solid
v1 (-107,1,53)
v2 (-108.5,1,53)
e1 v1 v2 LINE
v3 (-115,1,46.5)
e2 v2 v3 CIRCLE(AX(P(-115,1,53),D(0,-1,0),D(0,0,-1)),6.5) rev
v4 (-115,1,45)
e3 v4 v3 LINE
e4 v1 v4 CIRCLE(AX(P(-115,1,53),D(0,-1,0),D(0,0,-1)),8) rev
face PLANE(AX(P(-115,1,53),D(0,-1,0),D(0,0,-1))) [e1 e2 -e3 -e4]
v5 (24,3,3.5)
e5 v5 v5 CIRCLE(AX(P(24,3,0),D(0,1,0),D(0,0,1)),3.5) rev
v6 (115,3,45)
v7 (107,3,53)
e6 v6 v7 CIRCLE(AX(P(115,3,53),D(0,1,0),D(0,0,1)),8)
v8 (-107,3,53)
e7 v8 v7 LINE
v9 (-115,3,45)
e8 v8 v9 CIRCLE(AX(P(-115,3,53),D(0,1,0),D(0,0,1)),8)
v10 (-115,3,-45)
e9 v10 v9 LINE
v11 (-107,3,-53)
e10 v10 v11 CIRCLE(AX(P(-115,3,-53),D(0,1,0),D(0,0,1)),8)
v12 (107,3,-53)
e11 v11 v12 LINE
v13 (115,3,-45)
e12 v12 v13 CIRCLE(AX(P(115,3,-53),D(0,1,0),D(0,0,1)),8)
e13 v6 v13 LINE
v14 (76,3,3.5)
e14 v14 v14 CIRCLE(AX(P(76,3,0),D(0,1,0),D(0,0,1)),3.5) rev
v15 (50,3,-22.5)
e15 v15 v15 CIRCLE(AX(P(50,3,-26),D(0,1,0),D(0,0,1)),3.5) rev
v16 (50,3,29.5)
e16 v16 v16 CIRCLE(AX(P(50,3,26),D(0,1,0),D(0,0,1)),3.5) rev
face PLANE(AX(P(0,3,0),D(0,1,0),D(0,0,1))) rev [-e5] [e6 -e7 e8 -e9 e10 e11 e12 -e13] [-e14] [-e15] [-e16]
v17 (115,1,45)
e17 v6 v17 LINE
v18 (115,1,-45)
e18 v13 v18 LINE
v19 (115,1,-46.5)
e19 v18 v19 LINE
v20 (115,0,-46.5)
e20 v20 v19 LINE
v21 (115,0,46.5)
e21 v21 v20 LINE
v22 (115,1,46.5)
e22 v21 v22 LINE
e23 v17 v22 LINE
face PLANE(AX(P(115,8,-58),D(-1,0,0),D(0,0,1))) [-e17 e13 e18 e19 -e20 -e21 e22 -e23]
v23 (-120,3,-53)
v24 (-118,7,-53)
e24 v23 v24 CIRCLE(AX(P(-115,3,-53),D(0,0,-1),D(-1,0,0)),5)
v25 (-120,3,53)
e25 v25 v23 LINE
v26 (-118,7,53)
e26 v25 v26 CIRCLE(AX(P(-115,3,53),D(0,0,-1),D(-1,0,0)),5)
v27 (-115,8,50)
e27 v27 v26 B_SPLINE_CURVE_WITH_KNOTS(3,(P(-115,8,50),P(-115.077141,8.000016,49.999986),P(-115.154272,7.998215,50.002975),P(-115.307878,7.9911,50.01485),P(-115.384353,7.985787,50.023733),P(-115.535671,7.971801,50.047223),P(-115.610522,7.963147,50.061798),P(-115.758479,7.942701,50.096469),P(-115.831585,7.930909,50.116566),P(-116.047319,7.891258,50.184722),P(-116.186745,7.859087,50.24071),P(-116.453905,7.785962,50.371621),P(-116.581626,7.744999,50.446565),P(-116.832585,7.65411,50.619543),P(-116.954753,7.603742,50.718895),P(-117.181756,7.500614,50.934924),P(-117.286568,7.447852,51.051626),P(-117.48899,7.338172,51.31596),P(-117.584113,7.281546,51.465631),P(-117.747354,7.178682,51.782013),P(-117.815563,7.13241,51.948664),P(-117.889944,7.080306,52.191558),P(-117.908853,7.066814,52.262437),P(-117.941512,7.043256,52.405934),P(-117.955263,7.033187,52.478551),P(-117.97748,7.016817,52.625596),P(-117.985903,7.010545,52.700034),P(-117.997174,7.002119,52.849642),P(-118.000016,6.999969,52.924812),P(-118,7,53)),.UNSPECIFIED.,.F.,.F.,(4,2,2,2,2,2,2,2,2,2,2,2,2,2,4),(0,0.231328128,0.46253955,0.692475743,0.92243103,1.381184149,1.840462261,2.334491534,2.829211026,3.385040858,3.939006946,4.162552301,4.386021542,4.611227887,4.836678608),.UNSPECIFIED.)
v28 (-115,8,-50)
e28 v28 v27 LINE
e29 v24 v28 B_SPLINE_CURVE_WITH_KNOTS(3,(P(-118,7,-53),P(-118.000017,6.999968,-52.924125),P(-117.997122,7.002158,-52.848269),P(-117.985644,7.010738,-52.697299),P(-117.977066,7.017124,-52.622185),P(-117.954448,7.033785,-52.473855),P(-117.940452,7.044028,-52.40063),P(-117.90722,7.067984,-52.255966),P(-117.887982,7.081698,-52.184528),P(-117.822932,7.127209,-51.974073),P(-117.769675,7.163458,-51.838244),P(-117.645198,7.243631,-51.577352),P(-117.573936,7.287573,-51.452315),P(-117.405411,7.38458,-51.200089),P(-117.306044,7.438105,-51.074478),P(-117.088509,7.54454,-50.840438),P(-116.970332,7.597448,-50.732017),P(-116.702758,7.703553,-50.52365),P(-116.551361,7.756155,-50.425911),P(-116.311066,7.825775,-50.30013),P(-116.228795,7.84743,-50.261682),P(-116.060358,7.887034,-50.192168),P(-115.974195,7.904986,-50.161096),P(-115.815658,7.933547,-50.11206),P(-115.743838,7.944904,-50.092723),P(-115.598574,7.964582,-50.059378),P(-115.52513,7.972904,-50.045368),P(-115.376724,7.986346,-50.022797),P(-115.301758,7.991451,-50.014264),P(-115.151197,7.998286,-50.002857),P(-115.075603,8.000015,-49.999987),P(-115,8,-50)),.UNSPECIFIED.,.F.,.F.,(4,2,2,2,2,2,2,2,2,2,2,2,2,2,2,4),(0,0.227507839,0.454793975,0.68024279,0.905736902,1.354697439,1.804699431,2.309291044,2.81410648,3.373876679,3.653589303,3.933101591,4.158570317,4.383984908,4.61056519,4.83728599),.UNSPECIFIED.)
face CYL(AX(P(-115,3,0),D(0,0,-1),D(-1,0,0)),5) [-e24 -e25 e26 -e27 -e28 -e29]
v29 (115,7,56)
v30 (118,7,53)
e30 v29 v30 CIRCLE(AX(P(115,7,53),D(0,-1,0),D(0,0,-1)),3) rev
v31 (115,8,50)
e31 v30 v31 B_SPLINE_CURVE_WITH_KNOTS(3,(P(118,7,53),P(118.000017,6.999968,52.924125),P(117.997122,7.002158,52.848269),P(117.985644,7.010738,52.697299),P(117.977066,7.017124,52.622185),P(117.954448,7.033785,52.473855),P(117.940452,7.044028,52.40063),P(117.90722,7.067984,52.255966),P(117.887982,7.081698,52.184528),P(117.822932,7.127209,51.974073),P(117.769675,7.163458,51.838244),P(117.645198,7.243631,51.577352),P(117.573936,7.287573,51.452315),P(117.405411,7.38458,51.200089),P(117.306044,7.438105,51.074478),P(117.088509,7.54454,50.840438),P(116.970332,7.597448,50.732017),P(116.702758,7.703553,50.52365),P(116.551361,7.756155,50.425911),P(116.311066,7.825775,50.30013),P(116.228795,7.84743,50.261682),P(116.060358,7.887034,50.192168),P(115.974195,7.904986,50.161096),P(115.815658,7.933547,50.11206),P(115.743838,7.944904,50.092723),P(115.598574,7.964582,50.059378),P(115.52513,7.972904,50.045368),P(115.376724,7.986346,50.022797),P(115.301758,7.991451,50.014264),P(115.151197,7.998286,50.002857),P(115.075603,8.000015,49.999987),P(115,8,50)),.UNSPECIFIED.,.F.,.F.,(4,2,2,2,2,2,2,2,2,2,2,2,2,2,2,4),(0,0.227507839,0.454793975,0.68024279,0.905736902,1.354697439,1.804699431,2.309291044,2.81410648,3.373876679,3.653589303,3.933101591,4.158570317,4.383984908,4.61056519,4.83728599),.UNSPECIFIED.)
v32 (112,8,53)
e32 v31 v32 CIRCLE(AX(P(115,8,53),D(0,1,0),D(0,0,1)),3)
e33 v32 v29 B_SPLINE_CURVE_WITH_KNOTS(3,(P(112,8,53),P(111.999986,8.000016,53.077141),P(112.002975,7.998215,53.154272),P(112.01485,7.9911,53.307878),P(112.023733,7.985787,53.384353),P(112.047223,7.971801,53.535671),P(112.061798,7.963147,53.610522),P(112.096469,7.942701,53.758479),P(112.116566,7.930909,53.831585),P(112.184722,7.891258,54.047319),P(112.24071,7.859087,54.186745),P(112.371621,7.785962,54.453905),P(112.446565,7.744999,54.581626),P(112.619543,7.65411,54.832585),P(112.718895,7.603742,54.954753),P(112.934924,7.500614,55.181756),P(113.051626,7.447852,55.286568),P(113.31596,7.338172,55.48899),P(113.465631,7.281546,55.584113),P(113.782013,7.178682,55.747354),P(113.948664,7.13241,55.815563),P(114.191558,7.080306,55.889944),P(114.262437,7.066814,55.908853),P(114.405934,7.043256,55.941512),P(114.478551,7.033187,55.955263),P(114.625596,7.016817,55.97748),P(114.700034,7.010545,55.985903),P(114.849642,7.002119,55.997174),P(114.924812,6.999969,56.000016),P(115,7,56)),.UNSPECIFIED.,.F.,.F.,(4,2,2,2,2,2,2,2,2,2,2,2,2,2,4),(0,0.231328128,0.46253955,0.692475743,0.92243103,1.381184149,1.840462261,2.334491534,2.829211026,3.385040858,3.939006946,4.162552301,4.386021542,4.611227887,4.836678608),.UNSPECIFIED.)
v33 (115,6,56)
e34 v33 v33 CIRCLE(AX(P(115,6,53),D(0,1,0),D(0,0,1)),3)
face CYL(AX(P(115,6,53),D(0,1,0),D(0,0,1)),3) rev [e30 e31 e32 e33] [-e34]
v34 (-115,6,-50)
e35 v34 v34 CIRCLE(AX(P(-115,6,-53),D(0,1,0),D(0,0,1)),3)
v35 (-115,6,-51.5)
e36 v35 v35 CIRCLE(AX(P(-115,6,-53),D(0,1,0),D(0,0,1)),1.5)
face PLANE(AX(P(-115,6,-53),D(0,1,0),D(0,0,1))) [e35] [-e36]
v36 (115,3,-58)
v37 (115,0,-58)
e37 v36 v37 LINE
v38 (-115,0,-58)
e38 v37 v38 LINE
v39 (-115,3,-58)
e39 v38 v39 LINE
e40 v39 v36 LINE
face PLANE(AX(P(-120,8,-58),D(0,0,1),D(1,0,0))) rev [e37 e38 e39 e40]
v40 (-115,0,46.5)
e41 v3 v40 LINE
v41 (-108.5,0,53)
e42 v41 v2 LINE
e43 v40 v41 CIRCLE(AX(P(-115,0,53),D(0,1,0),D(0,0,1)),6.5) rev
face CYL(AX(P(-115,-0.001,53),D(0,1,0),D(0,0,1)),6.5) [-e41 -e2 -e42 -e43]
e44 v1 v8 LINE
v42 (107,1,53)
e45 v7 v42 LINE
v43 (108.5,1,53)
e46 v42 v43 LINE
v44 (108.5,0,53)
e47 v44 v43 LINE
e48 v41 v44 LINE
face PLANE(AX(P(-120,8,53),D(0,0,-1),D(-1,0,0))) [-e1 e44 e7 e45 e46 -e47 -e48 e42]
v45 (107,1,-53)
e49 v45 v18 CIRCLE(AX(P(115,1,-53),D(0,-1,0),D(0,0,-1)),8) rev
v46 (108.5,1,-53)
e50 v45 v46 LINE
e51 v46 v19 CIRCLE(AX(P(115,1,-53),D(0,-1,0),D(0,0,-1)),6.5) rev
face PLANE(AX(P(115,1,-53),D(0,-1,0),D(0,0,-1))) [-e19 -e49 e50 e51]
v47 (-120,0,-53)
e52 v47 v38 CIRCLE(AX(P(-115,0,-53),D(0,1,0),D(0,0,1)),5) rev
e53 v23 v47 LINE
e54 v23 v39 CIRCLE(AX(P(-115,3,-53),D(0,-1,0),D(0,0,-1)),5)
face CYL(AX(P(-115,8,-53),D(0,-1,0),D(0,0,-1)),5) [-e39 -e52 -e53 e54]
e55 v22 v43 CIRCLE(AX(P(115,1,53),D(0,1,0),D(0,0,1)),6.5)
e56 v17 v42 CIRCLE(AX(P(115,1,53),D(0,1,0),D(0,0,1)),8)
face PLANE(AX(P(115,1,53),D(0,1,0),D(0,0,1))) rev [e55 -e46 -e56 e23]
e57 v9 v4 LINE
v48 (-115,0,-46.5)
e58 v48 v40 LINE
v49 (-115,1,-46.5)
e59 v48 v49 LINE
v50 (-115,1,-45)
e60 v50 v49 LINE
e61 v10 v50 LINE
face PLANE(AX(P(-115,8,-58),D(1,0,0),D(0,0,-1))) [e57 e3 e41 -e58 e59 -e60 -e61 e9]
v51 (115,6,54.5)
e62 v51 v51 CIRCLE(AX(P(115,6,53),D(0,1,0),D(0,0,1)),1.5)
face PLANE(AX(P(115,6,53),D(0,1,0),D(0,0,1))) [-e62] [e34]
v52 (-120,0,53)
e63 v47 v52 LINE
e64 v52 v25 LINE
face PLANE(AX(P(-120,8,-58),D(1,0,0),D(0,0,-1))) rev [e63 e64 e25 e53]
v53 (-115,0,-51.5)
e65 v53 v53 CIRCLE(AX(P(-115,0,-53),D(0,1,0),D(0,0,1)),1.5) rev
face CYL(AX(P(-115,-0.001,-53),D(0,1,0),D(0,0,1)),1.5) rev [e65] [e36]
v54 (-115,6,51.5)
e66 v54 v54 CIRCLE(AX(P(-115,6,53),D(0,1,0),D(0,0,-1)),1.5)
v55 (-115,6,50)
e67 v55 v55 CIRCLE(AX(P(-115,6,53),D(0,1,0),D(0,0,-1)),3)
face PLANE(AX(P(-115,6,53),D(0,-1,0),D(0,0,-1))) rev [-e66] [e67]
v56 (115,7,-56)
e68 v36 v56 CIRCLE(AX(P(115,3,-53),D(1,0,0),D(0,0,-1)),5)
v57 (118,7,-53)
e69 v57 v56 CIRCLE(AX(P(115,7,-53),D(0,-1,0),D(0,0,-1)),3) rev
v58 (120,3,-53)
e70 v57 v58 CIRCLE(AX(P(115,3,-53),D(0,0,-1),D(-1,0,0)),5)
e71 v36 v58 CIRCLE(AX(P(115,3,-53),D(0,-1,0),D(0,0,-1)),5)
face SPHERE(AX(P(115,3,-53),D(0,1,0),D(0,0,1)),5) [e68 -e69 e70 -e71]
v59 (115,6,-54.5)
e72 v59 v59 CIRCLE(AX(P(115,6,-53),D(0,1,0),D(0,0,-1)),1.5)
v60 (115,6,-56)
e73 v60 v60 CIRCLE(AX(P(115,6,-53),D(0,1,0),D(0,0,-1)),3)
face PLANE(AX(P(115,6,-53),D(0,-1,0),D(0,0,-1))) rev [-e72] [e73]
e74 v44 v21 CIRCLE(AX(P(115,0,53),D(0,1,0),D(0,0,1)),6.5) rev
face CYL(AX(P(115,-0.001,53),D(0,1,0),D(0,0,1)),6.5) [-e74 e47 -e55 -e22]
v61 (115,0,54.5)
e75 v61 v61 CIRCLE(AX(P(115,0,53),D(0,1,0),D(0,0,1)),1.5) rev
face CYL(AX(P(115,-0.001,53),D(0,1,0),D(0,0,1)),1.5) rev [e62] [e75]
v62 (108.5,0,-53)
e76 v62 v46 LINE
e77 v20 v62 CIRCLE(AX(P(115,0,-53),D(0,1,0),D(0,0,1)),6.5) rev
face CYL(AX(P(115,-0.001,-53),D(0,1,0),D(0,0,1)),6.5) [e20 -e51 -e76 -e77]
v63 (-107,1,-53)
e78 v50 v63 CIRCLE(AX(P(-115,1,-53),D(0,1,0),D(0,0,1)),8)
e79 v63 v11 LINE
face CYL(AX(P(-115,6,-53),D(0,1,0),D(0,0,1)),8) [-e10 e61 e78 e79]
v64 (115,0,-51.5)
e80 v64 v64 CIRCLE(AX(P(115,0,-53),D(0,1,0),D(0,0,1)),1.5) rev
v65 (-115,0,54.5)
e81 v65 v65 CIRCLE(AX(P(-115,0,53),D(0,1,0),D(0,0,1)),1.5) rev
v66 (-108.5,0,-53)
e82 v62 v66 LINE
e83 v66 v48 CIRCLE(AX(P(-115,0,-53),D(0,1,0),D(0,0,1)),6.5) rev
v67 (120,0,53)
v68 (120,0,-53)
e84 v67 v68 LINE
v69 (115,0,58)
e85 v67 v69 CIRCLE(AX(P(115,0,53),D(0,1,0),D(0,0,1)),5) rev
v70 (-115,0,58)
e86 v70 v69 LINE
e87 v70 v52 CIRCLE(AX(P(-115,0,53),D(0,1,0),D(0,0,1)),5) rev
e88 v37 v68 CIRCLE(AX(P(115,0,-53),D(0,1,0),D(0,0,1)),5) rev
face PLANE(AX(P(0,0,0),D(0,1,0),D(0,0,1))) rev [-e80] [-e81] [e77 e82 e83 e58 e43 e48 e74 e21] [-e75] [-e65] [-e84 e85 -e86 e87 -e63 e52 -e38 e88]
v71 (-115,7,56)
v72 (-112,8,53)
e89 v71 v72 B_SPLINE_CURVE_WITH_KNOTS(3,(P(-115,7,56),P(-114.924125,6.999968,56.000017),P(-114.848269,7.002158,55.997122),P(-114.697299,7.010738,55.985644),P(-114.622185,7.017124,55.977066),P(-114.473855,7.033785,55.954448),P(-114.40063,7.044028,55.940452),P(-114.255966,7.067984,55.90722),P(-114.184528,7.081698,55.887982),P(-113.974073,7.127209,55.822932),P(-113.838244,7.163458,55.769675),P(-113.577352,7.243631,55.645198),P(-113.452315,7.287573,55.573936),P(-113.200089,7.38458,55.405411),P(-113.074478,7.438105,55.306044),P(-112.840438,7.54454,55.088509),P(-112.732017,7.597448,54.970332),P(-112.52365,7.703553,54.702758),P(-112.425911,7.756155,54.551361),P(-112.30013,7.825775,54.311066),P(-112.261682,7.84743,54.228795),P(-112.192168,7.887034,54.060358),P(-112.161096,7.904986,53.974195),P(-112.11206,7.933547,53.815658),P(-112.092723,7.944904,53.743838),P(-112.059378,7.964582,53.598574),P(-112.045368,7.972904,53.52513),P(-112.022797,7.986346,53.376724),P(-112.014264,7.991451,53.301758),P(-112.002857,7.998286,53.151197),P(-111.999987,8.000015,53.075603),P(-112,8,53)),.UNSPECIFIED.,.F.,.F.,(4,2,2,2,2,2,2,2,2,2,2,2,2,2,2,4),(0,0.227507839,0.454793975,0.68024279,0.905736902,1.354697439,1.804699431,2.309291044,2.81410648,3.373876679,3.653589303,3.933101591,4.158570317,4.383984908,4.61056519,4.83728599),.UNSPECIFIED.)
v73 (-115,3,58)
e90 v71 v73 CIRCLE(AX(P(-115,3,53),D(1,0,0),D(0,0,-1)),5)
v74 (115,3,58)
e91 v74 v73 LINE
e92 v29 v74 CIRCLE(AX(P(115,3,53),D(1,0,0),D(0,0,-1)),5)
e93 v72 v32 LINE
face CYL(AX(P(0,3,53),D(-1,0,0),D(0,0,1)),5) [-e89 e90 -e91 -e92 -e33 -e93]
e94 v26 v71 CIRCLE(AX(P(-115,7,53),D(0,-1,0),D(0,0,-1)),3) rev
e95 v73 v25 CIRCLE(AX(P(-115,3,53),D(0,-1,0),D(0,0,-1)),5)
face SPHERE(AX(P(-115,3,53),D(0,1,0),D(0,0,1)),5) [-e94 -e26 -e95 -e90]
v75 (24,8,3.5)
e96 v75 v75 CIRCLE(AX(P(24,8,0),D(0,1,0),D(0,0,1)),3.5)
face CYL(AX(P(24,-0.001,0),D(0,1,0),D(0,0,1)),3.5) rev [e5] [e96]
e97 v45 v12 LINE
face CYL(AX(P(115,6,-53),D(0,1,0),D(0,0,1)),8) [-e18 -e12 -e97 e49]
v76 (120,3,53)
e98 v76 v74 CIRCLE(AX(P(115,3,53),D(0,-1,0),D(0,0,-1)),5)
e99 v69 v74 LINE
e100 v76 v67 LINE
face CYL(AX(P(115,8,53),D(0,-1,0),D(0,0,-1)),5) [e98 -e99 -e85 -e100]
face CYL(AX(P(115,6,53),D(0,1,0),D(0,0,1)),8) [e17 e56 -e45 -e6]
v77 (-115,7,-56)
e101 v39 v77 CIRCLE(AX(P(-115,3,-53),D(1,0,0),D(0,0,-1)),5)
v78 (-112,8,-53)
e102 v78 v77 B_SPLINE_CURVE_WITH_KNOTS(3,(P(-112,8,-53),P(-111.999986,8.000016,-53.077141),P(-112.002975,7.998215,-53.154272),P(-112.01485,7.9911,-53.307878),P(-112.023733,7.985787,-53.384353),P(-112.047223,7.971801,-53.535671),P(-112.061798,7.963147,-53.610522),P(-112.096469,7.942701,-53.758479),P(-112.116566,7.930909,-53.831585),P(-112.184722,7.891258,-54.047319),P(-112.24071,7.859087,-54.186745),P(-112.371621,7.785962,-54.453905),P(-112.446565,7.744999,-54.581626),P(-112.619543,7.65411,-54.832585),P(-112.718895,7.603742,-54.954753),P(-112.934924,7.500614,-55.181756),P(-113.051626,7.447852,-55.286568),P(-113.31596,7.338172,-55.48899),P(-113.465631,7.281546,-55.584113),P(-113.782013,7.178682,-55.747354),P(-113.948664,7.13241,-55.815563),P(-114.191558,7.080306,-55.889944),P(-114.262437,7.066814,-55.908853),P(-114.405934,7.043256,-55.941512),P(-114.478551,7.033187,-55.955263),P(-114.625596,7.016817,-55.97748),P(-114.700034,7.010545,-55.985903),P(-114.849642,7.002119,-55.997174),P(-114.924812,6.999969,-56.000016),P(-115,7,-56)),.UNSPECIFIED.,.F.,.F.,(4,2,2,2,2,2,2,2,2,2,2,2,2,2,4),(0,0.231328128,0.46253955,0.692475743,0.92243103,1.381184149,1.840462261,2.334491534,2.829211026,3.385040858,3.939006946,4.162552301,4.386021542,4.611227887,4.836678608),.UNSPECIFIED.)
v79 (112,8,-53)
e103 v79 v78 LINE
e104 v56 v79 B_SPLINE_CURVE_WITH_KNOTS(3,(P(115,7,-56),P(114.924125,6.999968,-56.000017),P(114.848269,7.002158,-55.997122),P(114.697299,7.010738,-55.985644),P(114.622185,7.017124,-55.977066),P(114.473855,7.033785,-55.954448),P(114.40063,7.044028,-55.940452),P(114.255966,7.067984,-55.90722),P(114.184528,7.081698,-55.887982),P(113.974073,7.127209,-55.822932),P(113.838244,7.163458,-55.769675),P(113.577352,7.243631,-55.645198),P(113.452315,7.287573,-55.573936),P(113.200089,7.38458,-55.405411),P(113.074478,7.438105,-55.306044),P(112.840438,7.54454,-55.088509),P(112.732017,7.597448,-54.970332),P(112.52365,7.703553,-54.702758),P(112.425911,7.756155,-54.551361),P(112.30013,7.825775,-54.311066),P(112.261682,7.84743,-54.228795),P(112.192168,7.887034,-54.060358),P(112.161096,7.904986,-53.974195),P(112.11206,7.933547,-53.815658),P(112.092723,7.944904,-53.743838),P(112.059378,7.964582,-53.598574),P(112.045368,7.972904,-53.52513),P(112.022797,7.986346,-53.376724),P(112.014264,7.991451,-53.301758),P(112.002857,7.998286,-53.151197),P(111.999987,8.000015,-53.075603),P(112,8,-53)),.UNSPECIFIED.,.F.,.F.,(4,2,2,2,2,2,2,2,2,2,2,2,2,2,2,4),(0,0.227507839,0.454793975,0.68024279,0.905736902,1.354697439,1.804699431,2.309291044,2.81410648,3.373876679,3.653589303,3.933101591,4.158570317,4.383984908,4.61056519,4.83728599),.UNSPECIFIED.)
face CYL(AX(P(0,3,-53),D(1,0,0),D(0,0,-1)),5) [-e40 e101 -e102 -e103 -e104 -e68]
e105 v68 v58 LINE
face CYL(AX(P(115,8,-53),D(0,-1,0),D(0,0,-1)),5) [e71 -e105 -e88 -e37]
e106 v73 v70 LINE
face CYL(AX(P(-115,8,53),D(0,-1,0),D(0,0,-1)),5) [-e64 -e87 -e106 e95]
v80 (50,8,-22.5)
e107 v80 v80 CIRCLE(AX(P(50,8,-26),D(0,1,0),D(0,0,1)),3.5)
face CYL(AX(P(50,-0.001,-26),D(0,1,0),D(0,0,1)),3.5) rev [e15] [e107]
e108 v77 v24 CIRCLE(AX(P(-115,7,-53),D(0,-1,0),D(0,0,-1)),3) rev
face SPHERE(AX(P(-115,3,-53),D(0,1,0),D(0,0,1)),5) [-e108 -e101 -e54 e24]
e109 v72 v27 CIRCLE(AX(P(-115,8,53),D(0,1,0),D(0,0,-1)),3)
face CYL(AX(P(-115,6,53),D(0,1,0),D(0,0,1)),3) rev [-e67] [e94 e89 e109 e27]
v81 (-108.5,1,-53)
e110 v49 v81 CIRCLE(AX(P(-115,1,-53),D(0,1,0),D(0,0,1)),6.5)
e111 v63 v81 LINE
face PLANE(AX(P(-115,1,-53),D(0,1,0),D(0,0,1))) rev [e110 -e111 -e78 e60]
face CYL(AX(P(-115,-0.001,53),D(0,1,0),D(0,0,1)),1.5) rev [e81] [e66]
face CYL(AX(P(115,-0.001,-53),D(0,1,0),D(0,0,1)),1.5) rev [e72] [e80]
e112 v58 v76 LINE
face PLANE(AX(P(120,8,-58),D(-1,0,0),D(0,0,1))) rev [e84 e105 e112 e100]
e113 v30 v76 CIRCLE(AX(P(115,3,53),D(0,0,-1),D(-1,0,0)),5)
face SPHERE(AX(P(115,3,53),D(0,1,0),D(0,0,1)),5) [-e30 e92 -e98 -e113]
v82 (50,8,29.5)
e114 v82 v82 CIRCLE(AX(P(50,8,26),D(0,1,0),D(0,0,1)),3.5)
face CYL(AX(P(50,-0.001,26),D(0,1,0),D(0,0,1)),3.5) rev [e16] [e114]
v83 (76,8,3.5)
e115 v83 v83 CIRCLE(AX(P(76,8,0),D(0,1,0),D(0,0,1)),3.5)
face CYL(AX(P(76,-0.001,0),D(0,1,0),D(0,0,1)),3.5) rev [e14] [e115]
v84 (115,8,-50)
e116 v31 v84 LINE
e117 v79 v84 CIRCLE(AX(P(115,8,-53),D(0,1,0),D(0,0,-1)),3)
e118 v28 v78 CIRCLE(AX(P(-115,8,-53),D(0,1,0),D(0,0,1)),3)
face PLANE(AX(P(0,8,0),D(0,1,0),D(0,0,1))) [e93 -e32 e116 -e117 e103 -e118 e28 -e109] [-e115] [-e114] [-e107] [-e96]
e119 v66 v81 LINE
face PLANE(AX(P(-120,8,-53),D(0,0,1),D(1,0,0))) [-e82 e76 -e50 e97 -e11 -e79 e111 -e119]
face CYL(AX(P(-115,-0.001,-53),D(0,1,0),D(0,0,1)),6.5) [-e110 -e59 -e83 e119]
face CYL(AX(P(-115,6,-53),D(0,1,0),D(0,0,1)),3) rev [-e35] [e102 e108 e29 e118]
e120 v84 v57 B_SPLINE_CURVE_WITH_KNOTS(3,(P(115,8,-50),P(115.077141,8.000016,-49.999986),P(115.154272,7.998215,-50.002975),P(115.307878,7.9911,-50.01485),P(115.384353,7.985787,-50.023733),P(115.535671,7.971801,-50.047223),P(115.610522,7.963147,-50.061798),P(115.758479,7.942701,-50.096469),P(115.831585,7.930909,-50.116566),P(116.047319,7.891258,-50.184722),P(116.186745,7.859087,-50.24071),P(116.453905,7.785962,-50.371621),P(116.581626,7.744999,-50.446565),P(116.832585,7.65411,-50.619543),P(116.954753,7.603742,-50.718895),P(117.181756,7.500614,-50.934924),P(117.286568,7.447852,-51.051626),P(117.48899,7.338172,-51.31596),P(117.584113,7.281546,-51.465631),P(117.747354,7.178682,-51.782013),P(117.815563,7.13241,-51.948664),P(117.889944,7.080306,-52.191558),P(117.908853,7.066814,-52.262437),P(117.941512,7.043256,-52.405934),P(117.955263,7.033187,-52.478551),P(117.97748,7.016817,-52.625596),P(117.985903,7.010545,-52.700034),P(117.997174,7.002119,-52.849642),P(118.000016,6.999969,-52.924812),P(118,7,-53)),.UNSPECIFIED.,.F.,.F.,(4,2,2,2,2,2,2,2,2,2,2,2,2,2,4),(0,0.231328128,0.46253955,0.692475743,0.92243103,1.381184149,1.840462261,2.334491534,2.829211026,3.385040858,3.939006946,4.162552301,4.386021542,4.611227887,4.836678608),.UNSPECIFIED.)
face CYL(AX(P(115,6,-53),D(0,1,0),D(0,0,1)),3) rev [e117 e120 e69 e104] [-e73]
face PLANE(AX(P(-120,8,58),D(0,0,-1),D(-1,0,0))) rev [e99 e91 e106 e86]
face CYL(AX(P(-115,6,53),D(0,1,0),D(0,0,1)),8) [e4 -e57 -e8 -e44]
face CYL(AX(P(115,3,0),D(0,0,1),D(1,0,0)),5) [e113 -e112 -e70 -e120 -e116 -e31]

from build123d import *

# Parameters (mm, degrees)
SKETCH1_W           = 240
SKETCH1_H           = 116
BOSS_EXTRUDE1_DEPTH = 8
FILLET1_R           = 5
CUT_EXTRUDE1_REACH  = 135.522
SKETCH2_R           = 1.5
FILLET2_R           = 5
SKETCH3_R           = 3
SKETCH3_R_2         = 1.5
CUT_EXTRUDE2_DEPTH  = 2
SHELL1_DEPTH        = 3
SHELL1_2_DEPTH      = 1
CUT_EXTRUDE3_REACH  = 135.522
SKETCH4_R           = 3.5


# Read off the part's stored shape, not the designer's step: Shell1
with BuildPart() as part:
    # Sketch1 → Boss-Extrude1 (new body)
    with BuildSketch(Plane(origin=(0, 0, 0), x_dir=(1, 0, 0), z_dir=(0, 1, 0))):
        Rectangle(SKETCH1_W, SKETCH1_H)
    extrude(amount=BOSS_EXTRUDE1_DEPTH)

    # Fillet1
    fillet1_edges = [part.edges().sort_by_distance(p)[0] for p in [
        (120, 4, 58),
        (-120, 4, 58),
        (-120, 4, -58),
        (120, 4, -58),
    ]]
    fillet(fillet1_edges, radius=FILLET1_R)

    # Sketch2 → Cut-Extrude1 (cut, up to next)
    with BuildSketch(Plane(origin=(0, 8, 0), x_dir=(1, 0, 0), z_dir=(0, 1, 0)), mode=Mode.PRIVATE) as cut_extrude1_sk1:
        with Locations(Location((-115, -53, 0), (0, 0, 270))):
            Circle(SKETCH2_R)
    cut_extrude1_tool1 = extrude(cut_extrude1_sk1.sketch, amount=-CUT_EXTRUDE1_REACH, mode=Mode.PRIVATE) & part.part
    # Sketch2 → Cut-Extrude1 (cut, up to next)
    with BuildSketch(Plane(origin=(0, 8, 0), x_dir=(1, 0, 0), z_dir=(0, 1, 0)), mode=Mode.PRIVATE) as cut_extrude1_sk2:
        with Locations(Location((-115, 53, 0), (0, 0, 270))):
            Circle(SKETCH2_R)
    cut_extrude1_tool2 = extrude(cut_extrude1_sk2.sketch, amount=-CUT_EXTRUDE1_REACH, mode=Mode.PRIVATE) & part.part
    # Sketch2 → Cut-Extrude1 (cut, up to next)
    with BuildSketch(Plane(origin=(0, 8, 0), x_dir=(1, 0, 0), z_dir=(0, 1, 0)), mode=Mode.PRIVATE) as cut_extrude1_sk3:
        with Locations(Location((115, 53, 0), (0, 0, 270))):
            Circle(SKETCH2_R)
    cut_extrude1_tool3 = extrude(cut_extrude1_sk3.sketch, amount=-CUT_EXTRUDE1_REACH, mode=Mode.PRIVATE) & part.part
    # Sketch2 → Cut-Extrude1 (cut, up to next)
    with BuildSketch(Plane(origin=(0, 8, 0), x_dir=(1, 0, 0), z_dir=(0, 1, 0)), mode=Mode.PRIVATE) as cut_extrude1_sk4:
        with Locations(Location((115, -53, 0), (0, 0, 270))):
            Circle(SKETCH2_R)
    cut_extrude1_tool4 = extrude(cut_extrude1_sk4.sketch, amount=-CUT_EXTRUDE1_REACH, mode=Mode.PRIVATE) & part.part
    add(cut_extrude1_tool1.solids().sort_by_distance((-115, 8, 53))[0], mode=Mode.SUBTRACT)
    add(cut_extrude1_tool2.solids().sort_by_distance((-115, 8, -53))[0], mode=Mode.SUBTRACT)
    add(cut_extrude1_tool3.solids().sort_by_distance((115, 8, -53))[0], mode=Mode.SUBTRACT)
    add(cut_extrude1_tool4.solids().sort_by_distance((115, 8, 53))[0], mode=Mode.SUBTRACT)

    # Fillet2
    # the kernel refuses this fillet: 5 mm, written as the material it takes off along each edge
    with BuildSketch(Plane(origin=(-115, 8, -58), x_dir=(0, -1, 0), z_dir=(1, 0, 0))) as fillet2_piece_1:
        with BuildLine():
            CenterArc((FILLET2_R, -FILLET2_R), FILLET2_R, 90, 90)
            Line((0, -FILLET2_R), (0, 0))
            Line((0, 0), (FILLET2_R, 0))
        make_face()
    extrude(amount=230, mode=Mode.SUBTRACT)
    with BuildSketch(Plane(origin=(120, 8, -53), x_dir=(-1, 0, 0), z_dir=(0, 0, 1)), Plane(origin=(-120, 8, 53), x_dir=(1, 0, 0), z_dir=(0, 0, -1))) as fillet2_piece_2:
        with BuildLine():
            CenterArc((FILLET2_R, FILLET2_R), FILLET2_R, 180, 90)
            Line((0, FILLET2_R), (0, 0))
            Line((0, 0), (FILLET2_R, 0))
        make_face()
    extrude(amount=106, mode=Mode.SUBTRACT)
    with BuildSketch(Plane(origin=(115, 8, 58), x_dir=(0, 0, -1), z_dir=(-1, 0, 0))) as fillet2_piece_3:
        with BuildLine():
            CenterArc((FILLET2_R, FILLET2_R), FILLET2_R, 180, 90)
            Line((0, FILLET2_R), (0, 0))
            Line((0, 0), (FILLET2_R, 0))
        make_face()
    extrude(amount=230, mode=Mode.SUBTRACT)
    with BuildSketch(Plane(origin=(-115, 8, 53), x_dir=(0, 0, 1), z_dir=(1, 0, 0))) as fillet2_piece_4:
        with BuildLine():
            CenterArc((5 - FILLET2_R, FILLET2_R), FILLET2_R, 270, 90)
            Line((5, FILLET2_R), (5, 0))
            Line((5, 0), (5 - FILLET2_R, 0))
        make_face()
    revolve(axis=Axis((-115, 8, 53), (0, -1, 0)), revolution_arc=90, mode=Mode.SUBTRACT)
    with BuildSketch(Plane(origin=(-115, 8, -53), x_dir=(0, 0, -1), z_dir=(1, 0, 0))) as fillet2_piece_5:
        with BuildLine():
            CenterArc((5 - FILLET2_R, -FILLET2_R), FILLET2_R, 0, 90)
            Line((5 - FILLET2_R, 0), (5, 0))
            Line((5, 0), (5, -FILLET2_R))
        make_face()
    revolve(axis=Axis((-115, 8, -53), (0, 1, 0)), revolution_arc=90, mode=Mode.SUBTRACT)
    with BuildSketch(Plane(origin=(115, 8, 53), x_dir=(1, 0, 0), z_dir=(0, 0, -1))) as fillet2_piece_6:
        with BuildLine():
            CenterArc((5 - FILLET2_R, FILLET2_R), FILLET2_R, 270, 90)
            Line((5, FILLET2_R), (5, 0))
            Line((5, 0), (5 - FILLET2_R, 0))
        make_face()
    revolve(axis=Axis((115, 8, 53), (0, -1, 0)), revolution_arc=90, mode=Mode.SUBTRACT)
    with BuildSketch(Plane(origin=(115, 8, -53), x_dir=(0, 0, -1), z_dir=(-1, 0, 0))) as fillet2_piece_7:
        with BuildLine():
            CenterArc((5 - FILLET2_R, FILLET2_R), FILLET2_R, 270, 90)
            Line((5 - FILLET2_R, 0), (5, 0))
            Line((5, 0), (5, FILLET2_R))
        make_face()
    revolve(axis=Axis((115, 8, -53), (0, -1, 0)), revolution_arc=90, mode=Mode.SUBTRACT)

    # Sketch3 → Cut-Extrude2 (cut)
    # profile 1 of 4: a face of its own
    with BuildSketch(Plane(origin=(0, 8, 0), x_dir=(1, 0, 0), z_dir=(0, 1, 0))):
        with Locations(Location((-115, 53, 0), (0, 0, 270))):
            Circle(SKETCH3_R)
        with Locations(Location((-115, 53, 0), (0, 0, 270))):
            Circle(SKETCH3_R_2, mode=Mode.SUBTRACT)
    # profile 2 of 4: a face of its own
    with BuildSketch(Plane(origin=(0, 8, 0), x_dir=(1, 0, 0), z_dir=(0, 1, 0))):
        with Locations(Location((-115, -53, 0), (0, 0, 90))):
            Circle(SKETCH3_R)
        with Locations(Location((-115, -53, 0), (0, 0, 270))):
            Circle(SKETCH3_R_2, mode=Mode.SUBTRACT)
    # profile 3 of 4: a face of its own
    with BuildSketch(Plane(origin=(0, 8, 0), x_dir=(1, 0, 0), z_dir=(0, 1, 0))):
        with Locations(Location((115, -53, 0), (0, 0, 270))):
            Circle(SKETCH3_R)
        with Locations(Location((115, -53, 0), (0, 0, 270))):
            Circle(SKETCH3_R_2, mode=Mode.SUBTRACT)
    # profile 4 of 4: a face of its own
    with BuildSketch(Plane(origin=(0, 8, 0), x_dir=(1, 0, 0), z_dir=(0, 1, 0))):
        with Locations(Location((115, 53, 0), (0, 0, 90))):
            Circle(SKETCH3_R)
        with Locations(Location((115, 53, 0), (0, 0, 270))):
            Circle(SKETCH3_R_2, mode=Mode.SUBTRACT)
    extrude(amount=-CUT_EXTRUDE2_DEPTH, mode=Mode.SUBTRACT)

    # Shell1 outline → Shell1 (cut)
    with BuildSketch(Plane(origin=(0, 0, 0), x_dir=(1, 0, 0), z_dir=(0, 1, 0))):
        with BuildLine():
            ThreePointArc((-107, 53), (-109.343145751, 47.343145751), (-115, 45))
            Line((-115, 45), (-115, -45))
            ThreePointArc((-115, -45), (-109.343145751, -47.343145751), (-107, -53))
            Line((-107, -53), (107, -53))
            ThreePointArc((107, -53), (109.343145751, -47.343145751), (115, -45))
            Line((115, -45), (115, 45))
            ThreePointArc((115, 45), (109.343145751, 47.343145751), (107, 53))
            Line((107, 53), (-107, 53))
        make_face()
    extrude(amount=SHELL1_DEPTH, mode=Mode.SUBTRACT)

    # Shell1 2 outline → Shell1 2 (cut)
    with BuildSketch(Plane(origin=(0, 0, 0), x_dir=(1, 0, 0), z_dir=(0, 1, 0))):
        with BuildLine():
            Line((-115, 46.5), (-115, 45))
            ThreePointArc((-115, 45), (-109.343145751, 47.343145751), (-107, 53))
            Line((-107, 53), (-108.5, 53))
            ThreePointArc((-108.5, 53), (-110.403805922, 48.403805922), (-115, 46.5))
        make_face()
        with BuildLine():
            ThreePointArc((-107, -53), (-109.343145751, -47.343145751), (-115, -45))
            Line((-115, -45), (-115, -46.5))
            ThreePointArc((-115, -46.5), (-110.403805922, -48.403805922), (-108.5, -53))
            Line((-108.5, -53), (-107, -53))
        make_face()
        with BuildLine():
            Line((108.5, 53), (107, 53))
            ThreePointArc((107, 53), (109.343145751, 47.343145751), (115, 45))
            Line((115, 45), (115, 46.5))
            ThreePointArc((115, 46.5), (110.403805922, 48.403805922), (108.5, 53))
        make_face()
        with BuildLine():
            ThreePointArc((115, -45), (109.343145751, -47.343145751), (107, -53))
            Line((107, -53), (108.5, -53))
            ThreePointArc((108.5, -53), (110.403805922, -48.403805922), (115, -46.5))
            Line((115, -46.5), (115, -45))
        make_face()
    extrude(amount=SHELL1_2_DEPTH, mode=Mode.SUBTRACT)

    # Sketch4 → Cut-Extrude3 (cut, up to next)
    with BuildSketch(Plane(origin=(0, 8, 0), x_dir=(1, 0, 0), z_dir=(0, 1, 0)), mode=Mode.PRIVATE) as cut_extrude3_sk1:
        with Locations(Location((24, 0, 0), (0, 0, 270))):
            Circle(SKETCH4_R)
    cut_extrude3_tool1 = extrude(cut_extrude3_sk1.sketch, amount=-CUT_EXTRUDE3_REACH, mode=Mode.PRIVATE) & part.part
    # Sketch4 → Cut-Extrude3 (cut, up to next)
    with BuildSketch(Plane(origin=(0, 8, 0), x_dir=(1, 0, 0), z_dir=(0, 1, 0)), mode=Mode.PRIVATE) as cut_extrude3_sk2:
        with Locations(Location((50, 26, 0), (0, 0, 270))):
            Circle(SKETCH4_R)
    cut_extrude3_tool2 = extrude(cut_extrude3_sk2.sketch, amount=-CUT_EXTRUDE3_REACH, mode=Mode.PRIVATE) & part.part
    # Sketch4 → Cut-Extrude3 (cut, up to next)
    with BuildSketch(Plane(origin=(0, 8, 0), x_dir=(1, 0, 0), z_dir=(0, 1, 0)), mode=Mode.PRIVATE) as cut_extrude3_sk3:
        with Locations(Location((76, 0, 0), (0, 0, 270))):
            Circle(SKETCH4_R)
    cut_extrude3_tool3 = extrude(cut_extrude3_sk3.sketch, amount=-CUT_EXTRUDE3_REACH, mode=Mode.PRIVATE) & part.part
    # Sketch4 → Cut-Extrude3 (cut, up to next)
    with BuildSketch(Plane(origin=(0, 8, 0), x_dir=(1, 0, 0), z_dir=(0, 1, 0)), mode=Mode.PRIVATE) as cut_extrude3_sk4:
        with Locations(Location((50, -26, 0), (0, 0, 270))):
            Circle(SKETCH4_R)
    cut_extrude3_tool4 = extrude(cut_extrude3_sk4.sketch, amount=-CUT_EXTRUDE3_REACH, mode=Mode.PRIVATE) & part.part
    add(cut_extrude3_tool1.solids().sort_by_distance((24, 8, 0))[0], mode=Mode.SUBTRACT)
    add(cut_extrude3_tool2.solids().sort_by_distance((50, 8, -26))[0], mode=Mode.SUBTRACT)
    add(cut_extrude3_tool3.solids().sort_by_distance((76, 8, 0))[0], mode=Mode.SUBTRACT)
    add(cut_extrude3_tool4.solids().sort_by_distance((50, 8, 26))[0], mode=Mode.SUBTRACT)


solid = part.part
